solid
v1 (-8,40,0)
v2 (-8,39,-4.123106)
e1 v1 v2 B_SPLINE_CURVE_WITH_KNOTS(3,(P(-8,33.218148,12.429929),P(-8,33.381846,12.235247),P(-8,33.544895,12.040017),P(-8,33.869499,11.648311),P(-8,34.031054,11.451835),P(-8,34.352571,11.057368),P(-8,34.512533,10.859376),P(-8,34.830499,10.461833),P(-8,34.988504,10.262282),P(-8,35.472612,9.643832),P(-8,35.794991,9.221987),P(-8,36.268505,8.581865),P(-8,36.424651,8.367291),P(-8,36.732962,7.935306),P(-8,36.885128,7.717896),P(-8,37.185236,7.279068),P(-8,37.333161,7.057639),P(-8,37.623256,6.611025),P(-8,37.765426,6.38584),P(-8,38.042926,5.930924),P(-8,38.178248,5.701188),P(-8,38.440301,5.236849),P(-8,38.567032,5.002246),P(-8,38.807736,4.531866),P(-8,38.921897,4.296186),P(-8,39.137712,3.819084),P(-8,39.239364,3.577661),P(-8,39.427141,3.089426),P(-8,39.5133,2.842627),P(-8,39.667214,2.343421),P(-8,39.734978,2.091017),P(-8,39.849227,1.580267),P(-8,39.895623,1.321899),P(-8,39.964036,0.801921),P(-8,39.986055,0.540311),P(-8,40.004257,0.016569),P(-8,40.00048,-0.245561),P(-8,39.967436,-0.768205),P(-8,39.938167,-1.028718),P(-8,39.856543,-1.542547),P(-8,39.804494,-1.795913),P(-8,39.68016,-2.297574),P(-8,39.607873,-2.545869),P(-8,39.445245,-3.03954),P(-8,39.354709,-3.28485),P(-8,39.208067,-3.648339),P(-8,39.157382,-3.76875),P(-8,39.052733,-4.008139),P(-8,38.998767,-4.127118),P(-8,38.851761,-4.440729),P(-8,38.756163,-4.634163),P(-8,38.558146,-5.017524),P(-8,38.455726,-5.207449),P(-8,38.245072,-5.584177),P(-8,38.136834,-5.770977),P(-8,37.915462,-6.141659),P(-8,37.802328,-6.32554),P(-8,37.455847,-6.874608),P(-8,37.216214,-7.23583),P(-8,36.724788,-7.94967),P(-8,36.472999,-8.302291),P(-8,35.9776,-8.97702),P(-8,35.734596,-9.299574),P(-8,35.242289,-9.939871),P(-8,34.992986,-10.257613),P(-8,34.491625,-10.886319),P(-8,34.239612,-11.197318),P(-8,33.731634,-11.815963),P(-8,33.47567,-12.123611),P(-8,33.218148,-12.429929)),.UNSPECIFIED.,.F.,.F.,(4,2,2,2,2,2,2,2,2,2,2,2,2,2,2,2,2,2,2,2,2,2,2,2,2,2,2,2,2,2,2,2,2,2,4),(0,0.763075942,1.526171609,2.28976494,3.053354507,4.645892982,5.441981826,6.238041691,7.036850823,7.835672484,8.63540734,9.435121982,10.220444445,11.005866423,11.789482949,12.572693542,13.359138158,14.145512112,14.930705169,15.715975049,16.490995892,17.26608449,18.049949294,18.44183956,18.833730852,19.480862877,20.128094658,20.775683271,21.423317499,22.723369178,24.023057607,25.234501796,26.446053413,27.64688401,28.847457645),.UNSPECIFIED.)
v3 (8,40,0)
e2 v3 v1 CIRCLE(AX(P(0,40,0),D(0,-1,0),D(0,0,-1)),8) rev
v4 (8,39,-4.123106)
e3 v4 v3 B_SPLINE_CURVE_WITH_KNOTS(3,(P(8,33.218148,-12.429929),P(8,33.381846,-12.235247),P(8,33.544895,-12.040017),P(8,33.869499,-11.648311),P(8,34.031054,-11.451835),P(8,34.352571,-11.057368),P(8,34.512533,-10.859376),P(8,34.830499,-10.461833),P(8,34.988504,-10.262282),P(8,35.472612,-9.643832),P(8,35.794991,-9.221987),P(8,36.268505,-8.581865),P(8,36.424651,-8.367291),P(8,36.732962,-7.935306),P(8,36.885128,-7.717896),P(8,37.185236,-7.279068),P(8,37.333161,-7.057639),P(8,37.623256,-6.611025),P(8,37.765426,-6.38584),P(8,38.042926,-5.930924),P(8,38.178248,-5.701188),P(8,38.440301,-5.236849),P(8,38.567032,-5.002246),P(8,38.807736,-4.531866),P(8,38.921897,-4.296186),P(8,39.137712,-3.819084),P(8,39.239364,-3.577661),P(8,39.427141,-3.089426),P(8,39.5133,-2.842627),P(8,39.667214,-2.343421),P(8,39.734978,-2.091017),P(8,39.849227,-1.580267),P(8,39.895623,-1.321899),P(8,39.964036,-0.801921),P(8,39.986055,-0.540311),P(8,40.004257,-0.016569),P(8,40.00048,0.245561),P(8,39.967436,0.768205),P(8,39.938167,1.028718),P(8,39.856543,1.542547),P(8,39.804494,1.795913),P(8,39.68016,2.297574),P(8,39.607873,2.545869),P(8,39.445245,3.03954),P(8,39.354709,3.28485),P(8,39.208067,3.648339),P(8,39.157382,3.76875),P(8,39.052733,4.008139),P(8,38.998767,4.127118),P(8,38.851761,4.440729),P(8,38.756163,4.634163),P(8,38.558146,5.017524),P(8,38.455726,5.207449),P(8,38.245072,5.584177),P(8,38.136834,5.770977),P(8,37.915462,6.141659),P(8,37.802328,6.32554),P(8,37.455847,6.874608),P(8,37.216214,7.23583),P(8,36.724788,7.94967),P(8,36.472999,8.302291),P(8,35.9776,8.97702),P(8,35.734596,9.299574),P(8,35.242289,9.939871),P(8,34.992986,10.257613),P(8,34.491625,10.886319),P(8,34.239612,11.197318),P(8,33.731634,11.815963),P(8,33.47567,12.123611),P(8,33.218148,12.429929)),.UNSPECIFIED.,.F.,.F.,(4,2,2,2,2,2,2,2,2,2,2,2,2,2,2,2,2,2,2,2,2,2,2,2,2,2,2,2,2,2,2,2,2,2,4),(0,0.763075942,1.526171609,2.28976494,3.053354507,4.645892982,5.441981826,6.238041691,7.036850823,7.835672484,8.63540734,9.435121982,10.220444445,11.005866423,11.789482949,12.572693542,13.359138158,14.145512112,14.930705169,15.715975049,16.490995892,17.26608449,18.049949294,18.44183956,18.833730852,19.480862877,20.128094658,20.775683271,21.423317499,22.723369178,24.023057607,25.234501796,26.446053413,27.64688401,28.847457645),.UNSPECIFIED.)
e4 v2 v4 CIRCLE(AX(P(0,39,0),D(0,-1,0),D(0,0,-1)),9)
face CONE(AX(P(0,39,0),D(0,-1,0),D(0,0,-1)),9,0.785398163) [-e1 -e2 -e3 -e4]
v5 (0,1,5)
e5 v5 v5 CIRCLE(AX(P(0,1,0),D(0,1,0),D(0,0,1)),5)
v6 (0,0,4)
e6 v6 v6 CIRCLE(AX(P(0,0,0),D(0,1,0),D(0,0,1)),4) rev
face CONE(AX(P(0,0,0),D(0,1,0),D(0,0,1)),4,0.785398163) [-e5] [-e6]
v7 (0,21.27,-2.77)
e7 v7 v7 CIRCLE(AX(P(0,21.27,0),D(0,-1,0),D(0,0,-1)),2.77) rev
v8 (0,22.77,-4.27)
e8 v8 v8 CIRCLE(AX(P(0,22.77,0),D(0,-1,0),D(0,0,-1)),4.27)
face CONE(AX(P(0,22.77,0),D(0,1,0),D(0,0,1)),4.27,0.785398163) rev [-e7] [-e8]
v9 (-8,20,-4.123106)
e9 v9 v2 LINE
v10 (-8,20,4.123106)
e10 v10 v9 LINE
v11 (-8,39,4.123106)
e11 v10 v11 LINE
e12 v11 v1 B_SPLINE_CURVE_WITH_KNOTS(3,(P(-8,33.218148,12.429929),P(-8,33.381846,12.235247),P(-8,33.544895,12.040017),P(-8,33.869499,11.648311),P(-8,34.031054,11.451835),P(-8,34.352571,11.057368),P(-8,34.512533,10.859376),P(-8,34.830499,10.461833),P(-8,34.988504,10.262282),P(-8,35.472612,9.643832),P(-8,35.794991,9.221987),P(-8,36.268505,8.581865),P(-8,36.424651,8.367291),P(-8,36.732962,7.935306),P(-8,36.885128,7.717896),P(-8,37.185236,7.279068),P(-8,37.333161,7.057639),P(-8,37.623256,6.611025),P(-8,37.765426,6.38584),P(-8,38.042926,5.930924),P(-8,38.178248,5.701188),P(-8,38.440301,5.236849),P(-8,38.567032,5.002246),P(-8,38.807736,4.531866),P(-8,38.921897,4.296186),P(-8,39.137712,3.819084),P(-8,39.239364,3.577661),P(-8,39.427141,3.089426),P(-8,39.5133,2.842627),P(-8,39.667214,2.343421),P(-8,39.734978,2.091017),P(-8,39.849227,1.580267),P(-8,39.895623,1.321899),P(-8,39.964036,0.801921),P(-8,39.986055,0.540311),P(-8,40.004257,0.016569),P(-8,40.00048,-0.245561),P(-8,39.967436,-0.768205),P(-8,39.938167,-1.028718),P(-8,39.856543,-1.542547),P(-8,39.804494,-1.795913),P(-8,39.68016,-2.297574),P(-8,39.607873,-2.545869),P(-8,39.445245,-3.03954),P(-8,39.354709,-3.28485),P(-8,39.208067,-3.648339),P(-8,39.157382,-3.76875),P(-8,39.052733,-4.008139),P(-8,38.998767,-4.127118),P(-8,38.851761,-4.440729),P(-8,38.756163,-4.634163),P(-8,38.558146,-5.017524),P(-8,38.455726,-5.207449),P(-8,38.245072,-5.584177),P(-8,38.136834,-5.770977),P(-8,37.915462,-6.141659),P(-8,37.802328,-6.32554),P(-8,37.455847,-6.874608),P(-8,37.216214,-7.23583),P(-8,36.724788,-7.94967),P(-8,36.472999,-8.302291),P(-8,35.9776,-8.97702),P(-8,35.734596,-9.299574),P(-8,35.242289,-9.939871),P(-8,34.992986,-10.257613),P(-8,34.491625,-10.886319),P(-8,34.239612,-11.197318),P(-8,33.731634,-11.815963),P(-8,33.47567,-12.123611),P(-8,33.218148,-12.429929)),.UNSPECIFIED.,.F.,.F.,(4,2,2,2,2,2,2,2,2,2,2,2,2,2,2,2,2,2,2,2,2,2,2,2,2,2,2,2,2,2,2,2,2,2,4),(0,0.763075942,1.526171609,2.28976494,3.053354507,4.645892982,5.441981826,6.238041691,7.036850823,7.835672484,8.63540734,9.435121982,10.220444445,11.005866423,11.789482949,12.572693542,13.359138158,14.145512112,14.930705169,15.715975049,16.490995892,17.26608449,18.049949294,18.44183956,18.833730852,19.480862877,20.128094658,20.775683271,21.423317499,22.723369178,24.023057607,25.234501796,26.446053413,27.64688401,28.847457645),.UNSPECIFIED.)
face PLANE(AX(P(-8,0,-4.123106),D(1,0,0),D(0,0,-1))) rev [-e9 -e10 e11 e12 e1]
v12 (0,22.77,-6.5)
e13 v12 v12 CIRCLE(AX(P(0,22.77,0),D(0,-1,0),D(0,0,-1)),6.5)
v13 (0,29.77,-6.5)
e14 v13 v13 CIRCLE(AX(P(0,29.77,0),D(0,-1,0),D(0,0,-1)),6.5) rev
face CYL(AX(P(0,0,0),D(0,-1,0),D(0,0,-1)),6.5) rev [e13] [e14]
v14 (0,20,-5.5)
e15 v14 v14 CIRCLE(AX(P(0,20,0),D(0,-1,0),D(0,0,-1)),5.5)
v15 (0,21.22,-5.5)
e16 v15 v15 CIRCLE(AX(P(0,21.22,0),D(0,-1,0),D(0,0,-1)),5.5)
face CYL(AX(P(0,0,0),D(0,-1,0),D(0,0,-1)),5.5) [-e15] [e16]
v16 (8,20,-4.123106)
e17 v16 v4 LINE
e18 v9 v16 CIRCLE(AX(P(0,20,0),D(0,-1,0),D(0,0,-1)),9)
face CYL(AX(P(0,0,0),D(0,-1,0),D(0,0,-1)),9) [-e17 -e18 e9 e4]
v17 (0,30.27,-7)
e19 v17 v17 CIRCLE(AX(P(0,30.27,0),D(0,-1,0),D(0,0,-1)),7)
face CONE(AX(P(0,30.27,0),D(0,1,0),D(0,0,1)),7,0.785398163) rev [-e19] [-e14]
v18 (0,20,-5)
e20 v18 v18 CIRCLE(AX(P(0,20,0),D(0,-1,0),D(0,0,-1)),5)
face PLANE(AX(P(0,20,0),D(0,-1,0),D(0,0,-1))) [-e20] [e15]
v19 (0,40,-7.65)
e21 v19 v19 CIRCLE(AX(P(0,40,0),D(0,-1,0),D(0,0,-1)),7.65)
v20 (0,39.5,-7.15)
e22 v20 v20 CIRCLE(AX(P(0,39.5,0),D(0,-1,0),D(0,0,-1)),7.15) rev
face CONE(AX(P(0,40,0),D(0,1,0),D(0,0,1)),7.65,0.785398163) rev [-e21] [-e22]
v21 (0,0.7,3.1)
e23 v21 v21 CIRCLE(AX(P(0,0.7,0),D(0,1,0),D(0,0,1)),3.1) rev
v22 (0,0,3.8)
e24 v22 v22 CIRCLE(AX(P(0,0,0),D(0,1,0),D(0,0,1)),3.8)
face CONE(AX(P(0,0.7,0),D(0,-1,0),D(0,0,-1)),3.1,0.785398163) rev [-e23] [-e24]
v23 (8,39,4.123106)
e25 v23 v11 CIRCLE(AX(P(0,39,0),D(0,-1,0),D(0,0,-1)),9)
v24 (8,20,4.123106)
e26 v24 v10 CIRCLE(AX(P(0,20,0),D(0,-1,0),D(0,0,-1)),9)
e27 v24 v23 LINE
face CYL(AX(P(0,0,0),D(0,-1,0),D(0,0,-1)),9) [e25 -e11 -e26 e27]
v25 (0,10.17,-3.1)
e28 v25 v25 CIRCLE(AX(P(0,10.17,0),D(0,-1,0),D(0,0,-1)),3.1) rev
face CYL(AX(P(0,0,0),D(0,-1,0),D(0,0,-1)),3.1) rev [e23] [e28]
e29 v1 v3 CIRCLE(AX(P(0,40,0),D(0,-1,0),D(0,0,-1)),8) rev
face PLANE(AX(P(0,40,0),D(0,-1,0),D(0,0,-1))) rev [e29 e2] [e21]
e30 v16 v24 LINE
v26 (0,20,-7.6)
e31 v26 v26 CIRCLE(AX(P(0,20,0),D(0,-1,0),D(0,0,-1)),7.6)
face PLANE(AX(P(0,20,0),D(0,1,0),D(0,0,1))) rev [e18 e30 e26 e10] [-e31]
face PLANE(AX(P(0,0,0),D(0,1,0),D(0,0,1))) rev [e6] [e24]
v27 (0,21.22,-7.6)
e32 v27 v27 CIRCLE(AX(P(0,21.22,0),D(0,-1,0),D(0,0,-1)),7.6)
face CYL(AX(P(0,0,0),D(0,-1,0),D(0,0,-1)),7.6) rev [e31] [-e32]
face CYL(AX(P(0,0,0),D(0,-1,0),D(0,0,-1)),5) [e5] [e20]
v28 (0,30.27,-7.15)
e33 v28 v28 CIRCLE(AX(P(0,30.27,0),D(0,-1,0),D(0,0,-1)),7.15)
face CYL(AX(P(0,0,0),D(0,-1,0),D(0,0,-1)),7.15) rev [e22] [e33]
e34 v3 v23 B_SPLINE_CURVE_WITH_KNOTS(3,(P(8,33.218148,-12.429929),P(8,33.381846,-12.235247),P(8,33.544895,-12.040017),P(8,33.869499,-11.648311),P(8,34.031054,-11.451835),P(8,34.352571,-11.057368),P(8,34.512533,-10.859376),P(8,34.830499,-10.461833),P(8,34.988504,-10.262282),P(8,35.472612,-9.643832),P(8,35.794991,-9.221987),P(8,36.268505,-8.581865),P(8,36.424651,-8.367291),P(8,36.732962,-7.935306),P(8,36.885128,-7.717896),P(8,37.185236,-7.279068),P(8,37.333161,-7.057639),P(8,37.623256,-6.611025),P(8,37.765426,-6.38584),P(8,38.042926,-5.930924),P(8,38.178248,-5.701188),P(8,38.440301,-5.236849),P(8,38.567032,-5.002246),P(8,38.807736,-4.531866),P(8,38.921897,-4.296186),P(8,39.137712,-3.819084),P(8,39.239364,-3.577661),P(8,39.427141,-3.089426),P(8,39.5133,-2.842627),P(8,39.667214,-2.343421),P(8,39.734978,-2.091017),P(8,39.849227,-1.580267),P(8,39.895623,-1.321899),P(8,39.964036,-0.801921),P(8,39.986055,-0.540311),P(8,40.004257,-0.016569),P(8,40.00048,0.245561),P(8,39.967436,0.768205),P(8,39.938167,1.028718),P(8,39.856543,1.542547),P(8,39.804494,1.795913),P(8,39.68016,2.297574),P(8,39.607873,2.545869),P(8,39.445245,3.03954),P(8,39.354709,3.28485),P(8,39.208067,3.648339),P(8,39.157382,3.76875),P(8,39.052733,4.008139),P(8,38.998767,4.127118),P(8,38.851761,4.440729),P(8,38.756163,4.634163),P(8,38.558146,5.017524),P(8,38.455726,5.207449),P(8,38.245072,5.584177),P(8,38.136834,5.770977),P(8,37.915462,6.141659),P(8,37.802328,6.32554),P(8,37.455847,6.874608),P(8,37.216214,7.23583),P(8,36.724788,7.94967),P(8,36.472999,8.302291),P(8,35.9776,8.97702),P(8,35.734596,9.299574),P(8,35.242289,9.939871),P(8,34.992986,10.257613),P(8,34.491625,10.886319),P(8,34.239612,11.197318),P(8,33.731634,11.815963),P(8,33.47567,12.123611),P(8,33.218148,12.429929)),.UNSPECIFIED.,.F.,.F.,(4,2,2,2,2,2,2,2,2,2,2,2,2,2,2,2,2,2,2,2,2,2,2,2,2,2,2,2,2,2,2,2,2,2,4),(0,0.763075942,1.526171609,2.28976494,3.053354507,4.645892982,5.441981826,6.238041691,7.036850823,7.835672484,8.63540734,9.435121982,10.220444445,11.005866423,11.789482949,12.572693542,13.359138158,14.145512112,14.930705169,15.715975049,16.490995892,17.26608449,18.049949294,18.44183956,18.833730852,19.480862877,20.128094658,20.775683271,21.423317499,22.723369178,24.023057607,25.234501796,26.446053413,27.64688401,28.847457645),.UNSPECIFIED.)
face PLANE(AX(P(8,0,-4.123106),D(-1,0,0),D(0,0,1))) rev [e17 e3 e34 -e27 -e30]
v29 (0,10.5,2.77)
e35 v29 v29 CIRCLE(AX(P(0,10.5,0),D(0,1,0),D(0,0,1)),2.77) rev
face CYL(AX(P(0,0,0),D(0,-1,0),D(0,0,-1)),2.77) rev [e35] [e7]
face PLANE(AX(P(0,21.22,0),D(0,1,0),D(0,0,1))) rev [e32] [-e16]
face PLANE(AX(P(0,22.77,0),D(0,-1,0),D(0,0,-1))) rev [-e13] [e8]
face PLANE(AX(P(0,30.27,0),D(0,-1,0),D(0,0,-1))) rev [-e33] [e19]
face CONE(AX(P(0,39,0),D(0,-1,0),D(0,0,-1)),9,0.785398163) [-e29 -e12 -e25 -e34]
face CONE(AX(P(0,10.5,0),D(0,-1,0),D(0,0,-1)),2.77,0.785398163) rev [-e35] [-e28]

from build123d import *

# Parameters (mm, degrees)
CHANFREIN3_SIZE         = 1
ENL_V_MAT_EXTRU_1_DEPTH = 42.976183724
CHANFREIN4_SIZE         = 0.5
CHANFREIN5_SIZE         = 1.5
CHANFREIN6_SIZE         = 1
CHANFREIN7_SIZE         = 0.7
CHANFREIN2_SIZE         = 0.5


with BuildPart() as part:
    # Esquisse1 → Révolution1 (revolve)
    with BuildSketch(Plane.XY, mode=Mode.PRIVATE) as r_volution1_sk:
        Polygon((3.1, 10), (3.1, 0), (5, 0), (5, 18.12), (5, 20), (5.5, 20), (5.5, 21.22), (7.6, 21.22), (7.6, 20), (9, 20), (9, 40), (7.15, 40), (7.15, 30.27), (6.5, 30.27), (6.5, 22.77), (2.77, 22.77), (2.77, 10), align=None)
    revolve(r_volution1_sk.sketch.rotate(Axis((0, 0, 0), (0, 1, 0)), 90), axis=Axis((0, 0, 0), (0, 1, 0)))

    # Chanfrein3
    chanfrein3_edges = [part.edges().sort_by_distance(p)[0] for p in [
        (0, 40, 9),
    ]]
    chamfer(chanfrein3_edges, length=CHANFREIN3_SIZE)

    # Esquisse2 → Enlèv. mat.-Extru.1 (cut, through all)
    with BuildSketch(Plane(origin=(0, 40, 0), x_dir=(1, 0, 0), z_dir=(0, 1, 0))):
        with BuildLine():
            Line((-8, 4.123105626), (-8, -4.123105626))
            ThreePointArc((-8, -4.123105626), (-9, 0), (-8, 4.123105626))
        make_face()
        with BuildLine():
            Line((8, 4.123105626), (8, -4.123105626))
            ThreePointArc((8, -4.123105626), (9, 0), (8, 4.123105626))
        make_face()
    extrude(amount=-ENL_V_MAT_EXTRU_1_DEPTH, mode=Mode.SUBTRACT)

    # Chanfrein4
    chanfrein4_edges = [part.edges().sort_by_distance(p)[0] for p in [
        (0, 40, 7.15),
    ]]
    chamfer(chanfrein4_edges, length=CHANFREIN4_SIZE)

    # Chanfrein5
    chanfrein5_edges = [part.edges().sort_by_distance(p)[0] for p in [
        (0, 22.77, 2.77),
    ]]
    chamfer(chanfrein5_edges, length=CHANFREIN5_SIZE)

    # Chanfrein6
    chanfrein6_edges = [part.edges().sort_by_distance(p)[0] for p in [
        (0, 0, 5),
    ]]
    chamfer(chanfrein6_edges, length=CHANFREIN6_SIZE)

    # Chanfrein7
    chanfrein7_edges = [part.edges().sort_by_distance(p)[0] for p in [
        (0, 0, 3.1),
    ]]
    chamfer(chanfrein7_edges, length=CHANFREIN7_SIZE)

    # Chanfrein2
    # the kernel refuses this chamfer: 0.5 mm, written as the material it takes off along each edge
    with BuildSketch(Plane(origin=(0, 10, 0), x_dir=(0, 0, -1), z_dir=(1, 0, 0))) as chanfrein2_piece_1_section:
        Polygon((2.77 + CHANFREIN2_SIZE, 0), (2.77, CHANFREIN2_SIZE), (2.77, 0), align=None)
    chanfrein2_piece_1 = revolve(axis=Axis((0, 10, 0), (0, 1, 0)), mode=Mode.PRIVATE)
    chanfrein2_piece_1 = chanfrein2_piece_1 & Plane(origin=(0, 10.332893629, 0), x_dir=(0, 0, -1), z_dir=(0, -1, 0)) * Cylinder(3.1, 14, mode=Mode.PRIVATE)
    add(chanfrein2_piece_1, mode=Mode.SUBTRACT)
    with BuildSketch(Plane(origin=(0, 30.27, 0), x_dir=(0, 0, -1), z_dir=(1, 0, 0))) as chanfrein2_piece_2:
        Polygon((6.5, -CHANFREIN2_SIZE), (6.5 + CHANFREIN2_SIZE, 0), (6.5, 0), align=None)
    revolve(axis=Axis((0, 30.27, 0), (0, 1, 0)), mode=Mode.SUBTRACT)


solid = part.part
